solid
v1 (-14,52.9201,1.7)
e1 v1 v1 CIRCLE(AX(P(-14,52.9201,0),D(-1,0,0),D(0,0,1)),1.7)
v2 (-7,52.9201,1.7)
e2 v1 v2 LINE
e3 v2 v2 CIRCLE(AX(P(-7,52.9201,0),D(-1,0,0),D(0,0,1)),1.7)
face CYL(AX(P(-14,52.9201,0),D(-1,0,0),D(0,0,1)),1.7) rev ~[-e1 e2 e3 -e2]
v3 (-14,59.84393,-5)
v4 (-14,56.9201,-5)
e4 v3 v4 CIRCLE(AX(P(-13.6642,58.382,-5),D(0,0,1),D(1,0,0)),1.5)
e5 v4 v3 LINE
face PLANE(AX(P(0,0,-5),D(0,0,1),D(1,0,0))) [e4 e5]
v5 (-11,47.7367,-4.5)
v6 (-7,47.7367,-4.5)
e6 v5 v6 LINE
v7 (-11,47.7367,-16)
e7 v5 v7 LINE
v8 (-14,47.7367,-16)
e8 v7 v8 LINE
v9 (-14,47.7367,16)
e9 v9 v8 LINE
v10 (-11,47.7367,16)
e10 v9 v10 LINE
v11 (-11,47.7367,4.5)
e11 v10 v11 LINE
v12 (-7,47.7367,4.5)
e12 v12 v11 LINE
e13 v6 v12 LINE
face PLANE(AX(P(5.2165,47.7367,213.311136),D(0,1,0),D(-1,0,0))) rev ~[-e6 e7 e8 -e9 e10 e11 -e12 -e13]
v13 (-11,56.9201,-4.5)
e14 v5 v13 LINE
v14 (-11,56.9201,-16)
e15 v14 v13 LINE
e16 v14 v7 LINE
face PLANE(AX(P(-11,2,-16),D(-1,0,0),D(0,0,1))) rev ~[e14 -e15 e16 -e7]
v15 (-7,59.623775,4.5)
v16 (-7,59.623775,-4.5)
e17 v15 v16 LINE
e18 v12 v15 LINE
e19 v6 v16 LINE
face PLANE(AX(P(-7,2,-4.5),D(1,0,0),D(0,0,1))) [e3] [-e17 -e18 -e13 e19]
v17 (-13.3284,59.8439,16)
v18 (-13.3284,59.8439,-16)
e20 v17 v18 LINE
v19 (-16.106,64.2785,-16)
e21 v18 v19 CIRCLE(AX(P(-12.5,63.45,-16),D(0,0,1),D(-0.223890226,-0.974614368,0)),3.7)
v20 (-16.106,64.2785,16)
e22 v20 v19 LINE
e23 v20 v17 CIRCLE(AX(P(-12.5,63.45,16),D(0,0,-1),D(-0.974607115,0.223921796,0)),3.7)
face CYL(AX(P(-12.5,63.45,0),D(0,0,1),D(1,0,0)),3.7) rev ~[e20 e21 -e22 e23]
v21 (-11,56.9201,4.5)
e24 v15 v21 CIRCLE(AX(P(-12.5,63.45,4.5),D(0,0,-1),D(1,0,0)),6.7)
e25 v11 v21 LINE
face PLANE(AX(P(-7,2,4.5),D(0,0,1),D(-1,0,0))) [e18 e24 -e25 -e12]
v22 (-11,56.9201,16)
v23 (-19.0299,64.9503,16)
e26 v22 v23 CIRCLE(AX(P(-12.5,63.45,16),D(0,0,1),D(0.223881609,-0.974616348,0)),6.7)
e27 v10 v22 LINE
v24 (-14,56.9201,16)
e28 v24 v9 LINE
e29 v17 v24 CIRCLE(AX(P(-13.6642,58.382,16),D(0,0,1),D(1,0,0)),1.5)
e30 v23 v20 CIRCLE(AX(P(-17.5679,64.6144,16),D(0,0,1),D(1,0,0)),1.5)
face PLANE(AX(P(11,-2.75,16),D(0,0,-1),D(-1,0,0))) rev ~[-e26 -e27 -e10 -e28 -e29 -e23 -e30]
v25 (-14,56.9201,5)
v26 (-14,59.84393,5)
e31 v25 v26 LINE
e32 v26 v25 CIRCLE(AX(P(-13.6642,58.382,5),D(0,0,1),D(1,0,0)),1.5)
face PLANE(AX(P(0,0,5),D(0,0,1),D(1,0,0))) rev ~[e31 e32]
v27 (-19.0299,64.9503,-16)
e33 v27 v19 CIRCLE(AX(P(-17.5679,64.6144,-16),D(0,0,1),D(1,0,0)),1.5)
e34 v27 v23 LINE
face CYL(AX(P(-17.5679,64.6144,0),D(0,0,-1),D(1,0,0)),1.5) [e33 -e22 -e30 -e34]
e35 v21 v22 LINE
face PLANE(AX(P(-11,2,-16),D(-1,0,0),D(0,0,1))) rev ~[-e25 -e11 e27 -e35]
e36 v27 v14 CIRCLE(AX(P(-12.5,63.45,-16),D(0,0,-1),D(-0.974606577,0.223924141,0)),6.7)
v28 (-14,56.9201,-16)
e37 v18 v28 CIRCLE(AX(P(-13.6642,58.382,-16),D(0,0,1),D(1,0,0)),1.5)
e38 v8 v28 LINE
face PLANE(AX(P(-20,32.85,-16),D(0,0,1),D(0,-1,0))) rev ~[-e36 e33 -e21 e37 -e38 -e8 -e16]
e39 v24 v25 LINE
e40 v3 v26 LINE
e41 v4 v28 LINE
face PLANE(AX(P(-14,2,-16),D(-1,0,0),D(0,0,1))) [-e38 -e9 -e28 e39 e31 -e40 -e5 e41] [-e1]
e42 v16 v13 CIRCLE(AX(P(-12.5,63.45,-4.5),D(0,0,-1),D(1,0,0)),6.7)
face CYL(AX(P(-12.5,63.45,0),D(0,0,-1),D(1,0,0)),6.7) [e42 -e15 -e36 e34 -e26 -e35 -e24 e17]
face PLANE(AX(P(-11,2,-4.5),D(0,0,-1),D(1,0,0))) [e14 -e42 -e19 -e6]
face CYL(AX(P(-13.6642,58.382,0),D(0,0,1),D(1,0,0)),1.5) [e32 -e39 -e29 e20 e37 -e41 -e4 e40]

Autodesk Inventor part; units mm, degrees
ref_plane "YZ Plane" through (0, 0, 0) normal (1, 0, 0) x (0, 1, 0)
sketch "Sketch1" plane through (0, 0, 0) normal (0, 1, 0) x (-1, 0, 0)
  line L0 (11, -16) -> (-11, -16)
  line L1 (-11, -16) -> (-11, 16)
  line L2 (-11, 16) -> (11, 16)
  line L3 (11, 16) -> (11, -16)
  line L4 (11, -16) -> (-11, 16) construction
  line L5 (-11, -16) -> (11, 16) construction
  circle A0 centre (-2, 6.5) radius 4.8
  line L6 (-2, 6.5) -> (-2, -6.5)
  circle A1 centre (-2, -6.5) radius 4.8
  line L7 (-2, 11.3) -> (-11, 11.3)
  line L8 (-2, 1.7) -> (-11, 1.7)
  line L9 (-2, -1.7) -> (-11, -1.7)
  line L10 (-2, -11.3) -> (-11, -11.3)
  point P0 (0, 0)
  point P1 (-2, 0)
  dimension "d0" = 22
  dimension "d1" = 32
  dimension "d2" = 9.6
  dimension "d3" = 13
  dimension "d4" = 9.6
extrude "Extrusion1" add sketch "Sketch1" along normal blind 2 contours L0 L1 L10 A1 L6 A0 L7 L2 L3 | L1 L8 L6 L9
sketch "Sketch2" plane through (0, 0, 0) normal (0, -1, 0) x (1, 0, 0)
  line L0 (-11, 16) -> (11, 16) projected
  line L1 (11, 16) -> (-11, 16)
  line L2 (-11, -16) -> (-11, 16) projected
  line L3 (-11, 16) -> (-11, -16)
  line L4 (11, -16) -> (-11, -16) projected
  line L5 (-11, -16) -> (11, -16)
  line L6 (11, -16) -> (11, -14)
  line L7 (11, -11.3) -> (11, -16) projected
  line L8 (11, -14) -> (-5, -14)
  line L9 (-5, -14) -> (-5, 14)
  line L10 (-5, 14) -> (11, 14)
  line L11 (11, 16) -> (11, 11.3) projected
  point P0 (0, 0)
  dimension "d7" = 2
  dimension "d8" = 16
  dimension "d9" = 28
extrude "Extrusion2" add sketch "Sketch2" along normal blind 2.75
sketch "Sketch3" plane through (-11, 2, -16) normal (-1, 0, 0) x (0, 0, 1)
  line L0 (0, 0) -> (0, -4.75) projected
  line L1 (0, -4.75) -> (32, -4.75)
  line L2 (32, -4.75) -> (32, 49.75)
  line L3 (32, 49.75) -> (0, 49.75)
  line L4 (0, 49.75) -> (0, -4.75)
  point P0 (16, -2)
  dimension "d12" = 54.5
extrude "Extrusion3" add sketch "Sketch3" along normal blind 3
sketch "Sketch4" plane through (0, -2.75, 0) normal (0, -1, 0) x (1, 0, 0)
  line L0 (11, 16) -> (11, 11.3) projected
  line L1 (11, 16) -> (-39, 16)
  line L2 (-39, 16) -> (-39, -16)
  line L3 (-39, -16) -> (11, -16)
  line L4 (11, -16) -> (11, 16)
  point P0 (0, 0)
  dimension "d15" = 50
extrude "Extrusion4" add sketch "Sketch4" along normal blind 2
sketch "Sketch5" plane through (-5, 0, 14) normal (1, 0, 0) x (0, 0, -1)
  line L0 (0, 0) -> (0, -2.75) projected
  line L1 (30, -2.75) -> (-2, -2.75) projected
  line L2 (0, 0) -> (2.9896, 0)
  line L3 (2.9896, 0) -> (2.9896, -2.75)
  line L4 (2.9896, -2.75) -> (0, -2.5)
  line L5 (0, -2.5) -> (0, 0)
  point P0 (14, 0)
  dimension "d18" = 3
extrude "Extrusion5" cut sketch "Sketch5" against normal up to surface (9 mm away)
sketch "Sketch6" plane through (11, 0, 1.7) normal (1, 0, 0) x (0, 0, -1)
  line L0 (0, 0) -> (0, 2) projected
  line L1 (3.4, 0) -> (3.4, 2) projected
  line L2 (0, 1) -> (3.4, 1)
  line L3 (3.4, 1) -> (3.4, 2)
  line L4 (3.4, 2) -> (0, 2)
  line L5 (0, 2) -> (0, 1)
  point P0 (1.7, 0)
extrude "Extrusion6" cut sketch "Sketch6" against normal blind 2.2
sketch "Sketch8" plane through (-14, 2, -16) normal (-1, 0, 0) x (0, 0, 1)
  circle A0 centre (24.6, 39.75) radius 2.75
  circle A1 centre (24.6, 39.75) radius 1.4
  line L0 (4, 47.25) -> (28, 47.25) construction
  line L1 (28, 47.25) -> (28, -1.75) construction
  line L2 (28, -1.75) -> (4, -1.75) construction
  line L3 (4, -1.75) -> (4, 47.25) construction
  circle A2 centre (7.4, 5.75) radius 2.75
  circle A3 centre (7.4, 5.75) radius 1.4
  line L4 (4, 47.25) -> (28, -1.75) construction
  line L5 (32, -4.75) -> (32, -6.75) construction
  line L6 (32, 49.75) -> (0, 49.75) construction
  line L7 (0, -4.75) -> (32, 49.75) construction
  point P0 (16, -2)
  point P1 (16, 22.75)
  point P2 (16, 22.5)
  dimension "d24" = 5.5
  dimension "d25" = 2.8
  dimension "d26" = 24
  dimension "d27" = 49
  dimension "d28" = 3.4
  dimension "d29" = 7.5
  dimension "d30" = 5.5
  dimension "d31" = 2.8
  dimension "d32" = 3.4
  dimension "d33" = 7.5
extrude "Extrusion7" add sketch "Sketch8" along normal blind 7
sketch "Sketch9" plane through (0, 0, 0) normal (0, 0, 1) x (1, 0, 0)
  line L0 (-14, -2.75) -> (-14, 51.75) projected
  line L1 (-12.5, 56.75) -> (-12.5, 54.25) construction
  line L2 (-12.25, 56.75) -> (-12.25, 54.25)
  line L3 (-12.25, 54.25) -> (-12.75, 54.25)
  line L4 (-12.75, 54.25) -> (-12.75, 56.75)
  line L5 (-12.75, 56.75) -> (-12.25, 54.25) construction
  line L6 (-12.25, 56.75) -> (-12.75, 54.25) construction
  circle A0 centre (-12.5, 63.45) radius 6.7
  line L7 (-12.5, 63.45) -> (-12.5, 56.75) construction
  line L8 (-12.25, 56.75) -> (-12.25, 59.7585)
  line L9 (-12.75, 59.7585) -> (-12.75, 56.75)
  line L10 (-12.25, 59.7585) -> (-12.25, 70.1453)
  line L11 (-12.25, 70.1453) -> (-12.75, 70.1453)
  line L12 (-12.75, 70.1453) -> (-12.75, 59.7585)
  line L13 (-12.5, 63.45) -> (-5.8, 63.45) construction
  line L14 (-12.5, 63.45) -> (-5.8, 63.45) construction
  line L15 (-11, 51.75) -> (-14, 51.75) projected
  line L16 (-14, 51.75) -> (-11, 51.75)
  line L17 (-11, 51.75) -> (-11, 56.75)
  line L18 (-11, 56.75) -> (-14, 56.75)
  line L19 (-14, 56.75) -> (-14, 51.75)
  line L20 (-14, 56.75) -> (-11, 56.75)
  line L21 (-11, 56.75) -> (-11, 56.9201)
  line L22 (-11, 56.9201) -> (-14, 56.9201)
  line L23 (-14, 56.9201) -> (-14, 56.75)
  line L24 (-12.5, 63.45) -> (-5.8, 63.45) construction
  line L25 (-12.5, 63.45) -> (-5.8, 63.45) construction
  line L26 (-12.5, 63.45) -> (-5.8, 63.45) construction
  circle A1 centre (-12.5, 63.45) radius 3.7
  line L27 (-14, 56.9201) -> (-13.3284, 59.8439)
  line L28 (-12.5, 63.45) -> (-5.8, 63.45) construction
  circle A2 centre (-13.6642, 58.382) radius 1.5
  line L29 (-12.5, 63.45) -> (-7.7359, 63.45) construction
  line L30 (-19.0299, 64.9503) -> (-16.106, 64.2785)
  circle A3 centre (-17.5679, 64.6144) radius 1.5
  point P0 (0, 0)
  point P1 (-12.5, 55.5)
  point P2 (-12.75, 56.7547)
  point P3 (-12.25, 56.7547)
  point P4 (-19.2, 63.45)
  point P5 (-17.2376, 68.1876)
  dimension "d47" = 0.5
  dimension "d50" = 5
  dimension "d128" = 7.4
  dimension "d130" = 13.4
extrude "Extrusion8" add sketch "Sketch9" along normal mid plane 32 contours L18 L17 L15 L19 L4 L3 L2 | L18 A0 L8 | L8 A0 L21 L18 | L2 L3 L4 L18 | L8 L22 A0 | A0 L9 L22 L8 | L18 L9 A0 | L22 L8 A2 A1 L10 A0 | L22 L9 A2 L8 | L9 L18 L23 A0 | A0 A2 L22 L9 | A2 L9 L8 | L8 A2 | L22 A2 L9 | L27 A2 L9 L22 | A2 L27 | L22 A2 | L11 A0 | L10 A1 L12 L11 | A2 L9 A1 L8 | A3 L30 | A0 L12 A1 A3 | L30 A3 | A1 L9 A2
sketch "Sketch10" plane through (-11, 2, 16) normal (0, 0, 1) x (1, 0, 0)
  line L0 (-1.25, 52.25) -> (-1.25, 37.25)
  line L1 (-1.25, 37.25) -> (-1.75, 37.25)
  line L2 (-1.75, 37.25) -> (-1.75, 52.25)
  arc A0 (-2.2836, 58.0388) -> (-4.9111, 62.2338) centre (-1.5, 61.45) ccw projected
  line L3 (-1.75, 37.25) -> (19.102, 37.25) construction
  arc A1 (-2.2836, 58.0388) -> (-4.9111, 62.2338) centre (-1.5, 61.45) ccw projected
  line L4 (-1.25, 37.25) -> (19.602, 37.25) construction
  point P0 (11, -2)
  point P1 (-3.9749, 63.9249)
  point P2 (-1.75, 57.9589)
  point P3 (-1.25, 57.9589)
  point P4 (0.9749, 63.9249)
  point P5 (-5, 61.45)
  dimension "d51" = 15
extrude "Extrusion9" [suppressed]
sketch "Sketch11" plane through (0, 0, 0) normal (0, 0, 1) x (1, 0, 0)
  line L0 (-12.5, 63.45) -> (-18.3024, 60.1)
  line L1 (-14, 56.9201) -> (-14, 62.9804)
  circle A0 centre (-12.5, 63.45) radius 6.7
  point P0 (0, 0)
  point P1 (-14, 62.584)
extrude "Extrusion10" cut sketch "Sketch11" along normal mid plane 10 contours L1 A0 L0 picked at (-14.4333, 58.9557)
sketch "Sketch13" plane through (0, 2, 0) normal (0, 1, 0) x (1, 0, 0)
  line L0 (-11, 16) -> (-11, -16) projected
  line L1 (-11, 0) -> (-9, 0) construction
  line L2 (-11, 4.5) -> (-7, 4.5)
  line L3 (-7, 4.5) -> (-7, -4.5)
  line L4 (-7, -4.5) -> (-11, -4.5)
  line L5 (-11, -4.5) -> (-11, 4.5)
  line L6 (-11, 4.5) -> (-7, -4.5) construction
  line L7 (-7, 4.5) -> (-11, -4.5) construction
  point P0 (0, 0)
  point P1 (-11, -4.5)
  dimension "d66" = 2
  dimension "d67" = 4
  dimension "d68" = 9
extrude "Extrusion12" add sketch "Sketch13" along normal up to surface
sketch "Sketch12" plane through (-14, 2, -16) normal (-1, 0, 0) x (0, 0, 1)
  line L0 (0, 54.9201) -> (32, 54.9201) projected
  line L1 (16, 54.9201) -> (16, 50.9201) construction
  circle A0 centre (16, 50.9201) radius 1.7
  point P0 (16, -2)
  dimension "d62" = 4
  dimension "d63" = 3.4
extrude "Extrusion11" cut sketch "Sketch12" against normal through all
sketch "Sketch14" plane through (-7, 2, 4.5) normal (1, 0, 0) x (0, 0, -1)
  circle A0 centre (4.5, 50.9201) radius 2.9
  point P0 (4.5, -2)
  point P1 (4.5, 50.9201)
  dimension "d96" = 5.8
extrude "Extrusion13" [suppressed]
sketch "Sketch15" plane through (-14, 2, -16) normal (-1, 0, 0) x (0, 0, 1)
  line L0 (0, 28.85) -> (6, 28.85) construction
  line L1 (6, 28.85) -> (6, 16.65) construction
  line L2 (6, 16.65) -> (0, 16.65) construction
  line L3 (0, 16.65) -> (0, 28.85) construction
  line L4 (0, -4.75) -> (0, 54.9201) projected
  line L5 (0, 28.85) -> (6, 28.85)
  line L6 (6, 28.85) -> (6, 30.85)
  line L7 (6, 30.85) -> (0, 30.85)
  line L8 (0, 30.85) -> (0, 28.85)
  line L9 (6, 16.65) -> (0, 16.65)
  line L10 (0, 16.65) -> (0, 14.65)
  line L11 (0, 14.65) -> (6, 14.65)
  line L12 (6, 14.65) -> (6, 16.65)
  circle A0 centre (24.6, 39.75) radius 1.4 projected
  circle A1 centre (7.4, 5.75) radius 1.4 projected
  line L13 (24.6, 39.75) -> (7.4, 5.75)
  line L14 (16, 22.75) -> (-10.8534, 22.75) construction
  line L15 (6, 30.85) -> (8, 30.85)
  line L16 (8, 30.85) -> (8, 14.65)
  line L17 (8, 14.65) -> (6, 14.65)
  line L18 (6, 14.65) -> (6, 30.85)
  point P0 (16, -2)
  point P1 (0, 22.75)
  dimension "d78" = 6
  dimension "d79" = 12.2
  dimension "d80" = 2
  dimension "d81" = 2
  dimension "d101" = 2
extrude "Extrusion14" add sketch "Sketch15" along normal blind 6 contours L4 L9 L12 L11 | L4 L7 L6 L5
sketch "Sketch20" plane through (-14, 2, -16) normal (-1, 0, 0) x (0, 0, 1)
  line L0 (6, 14.65) -> (6, 16.65) projected
  line L1 (6.0001, 28.8153) -> (6, 16.65) construction
  line L2 (5, 22.75) -> (6, 22.75) construction
  line L3 (5, 24.75) -> (7, 24.75)
  line L4 (7, 24.75) -> (7, 20.75)
  line L5 (7, 20.75) -> (5, 20.75)
  line L6 (5, 20.75) -> (5, 24.75)
  line L7 (5, 24.75) -> (7, 20.75) construction
  line L8 (7, 24.75) -> (5, 20.75) construction
  line L9 (0, 16.65) -> (0, 28.85) projected
  line L10 (0, 22.75) -> (5, 22.75) construction
  point P0 (16, -2)
  dimension "d102" = 1
  dimension "d103" = 2
  dimension "d104" = 4
  dimension "d109" = 5
extrude "Extrusion17" add sketch "Sketch20" along normal blind 1
sketch "Sketch21" plane through (-20, 2, -16) normal (-1, 0, 0) x (0, 0, 1)
  line L0 (0, 54.9201) -> (0, 0) projected
  line L1 (6, 16.65) -> (6, 14.65) projected
  line L2 (0, 30.85) -> (6, 30.85)
  line L3 (6, 30.85) -> (6, 14.65)
  line L4 (6, 14.65) -> (0, 14.65)
  line L5 (0, 14.65) -> (0, 30.85)
  line L6 (6, 30.85) -> (0, 30.85) projected
  point P0 (16, -2)
  point P1 (0, 14.65)
extrude "Extrusion18" add sketch "Sketch21" along normal blind 1
ref_plane "Work Plane1" through (0, -19.75, 0) normal (0, -1, 0) x (1, 0, 0)
sketch "Sketch16" plane through (0, -19.75, 0) normal (0, -1, 0) x (1, 0, 0)
  line L0 (11, -16) -> (11, 16) projected
  line L1 (11, 16) -> (-39, 16) projected
  line L2 (-39, 16) -> (-39, -16) projected
  line L3 (-39, -16) -> (11, -16) projected
  line L4 (-39, -16) -> (11, -16) projected
  line L5 (-14, 16) -> (-39, 16) projected
  line L6 (11, -16) -> (-39, 16) construction
  circle A0 centre (-14, 0) radius 10.4
  circle A1 centre (-14, 0) radius 13.4
  point P0 (0, 0)
  dimension "d85" = 20.8
  dimension "d86" = 26.8
extrude "Extrusion15" add sketch "Sketch16" along normal blind 40 contours A1
sketch "Sketch17" plane through (0, -4.75, 0) normal (0, -1, 0) x (1, 0, 0)
  line L0 (11, -16) -> (11, 16) projected
  line L1 (11, 16) -> (-39, 16) projected
  line L2 (-39, 16) -> (-39, -16) projected
  line L3 (-39, -16) -> (11, -16) projected
  point P0 (0, 0)
loft "Loft1" add profiles "Sketch17" section 1 edges at (-27.4, -19.75, 0)
sketch "Sketch18" plane through (0, 0, 0) normal (0, 0, 1) x (1, 0, 0)
  line L0 (-3.6, -19.75) -> (-24.4, -19.75) projected
  line L1 (-14, -19.75) -> (-3.6, -30.15)
  line L2 (-3.6, -59.75) -> (-3.6, -19.75) projected
  line L3 (-14, -19.75) -> (0.7078, -19.75) construction
  line L4 (-14, -19.75) -> (-14, -37.459) construction
  point P0 (0, 0)
  dimension "d93" = 45
revolve "Revolution1" add sketch "Sketch18" angle 360 about axis through (-14, -19.75, 0) along (0, -1, 0)
fillet "Fillet1" [suppressed]
ref_plane "Work Plane2" through (0, 70.15, 0) normal (0, 1, 0) x (-1, 0, 0)
sketch "Sketch19" plane through (0, 70.15, 0) normal (0, 1, 0) x (-1, 0, 0)
  line L0 (5.8, -16) -> (5.8, 16) projected
  line L1 (5.8, 0) -> (19.2, 0)
  circle A0 centre (12.5, 0) radius 1
  point P0 (0, 0)
  dimension "d98" = 2
extrude "Extrusion16" [suppressed]
sketch "Sketch22" plane through (0, 0, 0) normal (0, 0, 1) x (1, 0, 0)
  line L0 (-27.4, -59.75) -> (-0.6, -59.75) projected
  line L1 (-14, -59.75) -> (-14, -49.75)
  circle A0 centre (-14, -49.75) radius 2.3
  point P0 (0, 0)
  dimension "d111" = 10
  dimension "d112" = 4.6
extrude "Extrusion19" cut sketch "Sketch22" against normal up to surface
fillet "Fillet2" radius 2 4 edges at (4.1432, -12.25, -11.6117) (-32.1432, -12.25, -11.6117) (-32.1432, -12.25, 11.6117) (4.1432, -12.25, 11.6117)
fillet "Fillet3" radius 50 5 edges at (-14, -19.75, 13.4) (-27.4, -19.75, 0) (-14, -19.75, -13.4) (-1.1392, -19.75, 3.7631) (-1.1392, -19.75, -3.7631)
fillet "Fillet4" [suppressed]
chamfer "Chamfer1" distance 1 angle 45 2 edges at (-15, 22.75, -10) (-15, 26.75, -10)
ref_plane "Work Plane3" through (0, 0, -15.9) normal (0, 0, 1) x (1, 0, 0)
sketch "Sketch25" plane through (0, 0, -15.9) normal (0, 0, 1) x (1, 0, 0)
  spline S0 degree 8 poles (-11.7, -49.75) (-11.7, -49.5097) (-11.7287, -49.2698) (-11.7859, -49.0321) (-11.8723, -48.7988) (-11.9888, -48.5725) (-12.137, -48.3567) (-12.3183, -48.1562) (-12.7177, -47.8258) (-12.9335, -47.6839) (-13.1784, -47.5646) (-13.4462, -47.4772) (-13.7287, -47.428) (-14.0168, -47.4199) (-14.3008, -47.4526) (-14.852, -47.5941) (-15.1085, -47.7029) (-15.3387, -47.8407) (-15.5414, -48.0011) (-15.7165, -48.1787) (-15.8642, -48.3688) (-15.9854, -48.5672) (-16.1908, -49.0039) (-16.2689, -49.2473) (-16.3156, -49.4971) (-16.3311, -49.75) (-16.3156, -50.0029) (-16.2689, -50.2527) (-16.1908, -50.4961) (-15.9913, -50.9202) (-15.8793, -51.1063) (-15.7442, -51.285) (-15.5854, -51.4532) (-15.4024, -51.6074) (-15.195, -51.7431) (-14.9639, -51.8552) (-14.4711, -52.0153) (-14.2151, -52.0653) (-13.95, -52.0819) (-13.6839, -52.0629) (-13.4255, -52.009) (-13.1825, -51.9242) (-12.9617, -51.8152) (-12.4907, -51.5162) (-12.2578, -51.3051) (-12.0678, -51.0702) (-11.9188, -50.8193) (-11.8088, -50.5579) (-11.7362, -50.2904) (-11.7, -50.02) (-11.7, -49.75) knots 0 0 0 0 0 0 0 0 0 0.154765 0.154765 0.154765 0.154765 0.154765 0.154765 0.154765 0.286658 0.286658 0.286658 0.286658 0.286658 0.286658 0.286658 0.422821 0.422821 0.422821 0.422821 0.422821 0.422821 0.422821 0.578882 0.578882 0.578882 0.578882 0.578882 0.578882 0.578882 0.706632 0.706632 0.706632 0.706632 0.706632 0.706632 0.706632 0.827549 0.827549 0.827549 0.827549 0.827549 0.827549 0.827549 1 1 1 1 1 1 1 1 1 projected
  line L0 (-27.4, -59.75) -> (-0.6, -59.75) projected
  line L1 (-12.4508, -48.05) -> (-16.2649, -50.1503) construction
  line L2 (-12.0685, -50.9987) -> (-15.8752, -51.0817) construction
  line L3 (-13.9718, -51.0402) -> (-14.0129, -49.1567) construction
  line L4 (-14.3578, -49.1002) -> (-13.757, -50.1913) construction
  circle A0 centre (-14, -49.75) radius 4.3
  point P0 (0, 0)
  dimension "d125" = 8.6
extrude "Extrusion21" add sketch "Sketch25" along normal up to surface
sketch "Sketch26" plane through (11, 2, -16) normal (0, 0, -1) x (-1, 0, 0)
  line L0 (5.7835, 45.7367) -> (45.0889, 45.7367)
  point P0 (11, -2)
split body "Split1" sketch "Sketch26" result one side removed curves L0 removed pieces at (-13.9348, -47.852, 12.8998)
properties part number "prototype_8_1_3DPrint"
